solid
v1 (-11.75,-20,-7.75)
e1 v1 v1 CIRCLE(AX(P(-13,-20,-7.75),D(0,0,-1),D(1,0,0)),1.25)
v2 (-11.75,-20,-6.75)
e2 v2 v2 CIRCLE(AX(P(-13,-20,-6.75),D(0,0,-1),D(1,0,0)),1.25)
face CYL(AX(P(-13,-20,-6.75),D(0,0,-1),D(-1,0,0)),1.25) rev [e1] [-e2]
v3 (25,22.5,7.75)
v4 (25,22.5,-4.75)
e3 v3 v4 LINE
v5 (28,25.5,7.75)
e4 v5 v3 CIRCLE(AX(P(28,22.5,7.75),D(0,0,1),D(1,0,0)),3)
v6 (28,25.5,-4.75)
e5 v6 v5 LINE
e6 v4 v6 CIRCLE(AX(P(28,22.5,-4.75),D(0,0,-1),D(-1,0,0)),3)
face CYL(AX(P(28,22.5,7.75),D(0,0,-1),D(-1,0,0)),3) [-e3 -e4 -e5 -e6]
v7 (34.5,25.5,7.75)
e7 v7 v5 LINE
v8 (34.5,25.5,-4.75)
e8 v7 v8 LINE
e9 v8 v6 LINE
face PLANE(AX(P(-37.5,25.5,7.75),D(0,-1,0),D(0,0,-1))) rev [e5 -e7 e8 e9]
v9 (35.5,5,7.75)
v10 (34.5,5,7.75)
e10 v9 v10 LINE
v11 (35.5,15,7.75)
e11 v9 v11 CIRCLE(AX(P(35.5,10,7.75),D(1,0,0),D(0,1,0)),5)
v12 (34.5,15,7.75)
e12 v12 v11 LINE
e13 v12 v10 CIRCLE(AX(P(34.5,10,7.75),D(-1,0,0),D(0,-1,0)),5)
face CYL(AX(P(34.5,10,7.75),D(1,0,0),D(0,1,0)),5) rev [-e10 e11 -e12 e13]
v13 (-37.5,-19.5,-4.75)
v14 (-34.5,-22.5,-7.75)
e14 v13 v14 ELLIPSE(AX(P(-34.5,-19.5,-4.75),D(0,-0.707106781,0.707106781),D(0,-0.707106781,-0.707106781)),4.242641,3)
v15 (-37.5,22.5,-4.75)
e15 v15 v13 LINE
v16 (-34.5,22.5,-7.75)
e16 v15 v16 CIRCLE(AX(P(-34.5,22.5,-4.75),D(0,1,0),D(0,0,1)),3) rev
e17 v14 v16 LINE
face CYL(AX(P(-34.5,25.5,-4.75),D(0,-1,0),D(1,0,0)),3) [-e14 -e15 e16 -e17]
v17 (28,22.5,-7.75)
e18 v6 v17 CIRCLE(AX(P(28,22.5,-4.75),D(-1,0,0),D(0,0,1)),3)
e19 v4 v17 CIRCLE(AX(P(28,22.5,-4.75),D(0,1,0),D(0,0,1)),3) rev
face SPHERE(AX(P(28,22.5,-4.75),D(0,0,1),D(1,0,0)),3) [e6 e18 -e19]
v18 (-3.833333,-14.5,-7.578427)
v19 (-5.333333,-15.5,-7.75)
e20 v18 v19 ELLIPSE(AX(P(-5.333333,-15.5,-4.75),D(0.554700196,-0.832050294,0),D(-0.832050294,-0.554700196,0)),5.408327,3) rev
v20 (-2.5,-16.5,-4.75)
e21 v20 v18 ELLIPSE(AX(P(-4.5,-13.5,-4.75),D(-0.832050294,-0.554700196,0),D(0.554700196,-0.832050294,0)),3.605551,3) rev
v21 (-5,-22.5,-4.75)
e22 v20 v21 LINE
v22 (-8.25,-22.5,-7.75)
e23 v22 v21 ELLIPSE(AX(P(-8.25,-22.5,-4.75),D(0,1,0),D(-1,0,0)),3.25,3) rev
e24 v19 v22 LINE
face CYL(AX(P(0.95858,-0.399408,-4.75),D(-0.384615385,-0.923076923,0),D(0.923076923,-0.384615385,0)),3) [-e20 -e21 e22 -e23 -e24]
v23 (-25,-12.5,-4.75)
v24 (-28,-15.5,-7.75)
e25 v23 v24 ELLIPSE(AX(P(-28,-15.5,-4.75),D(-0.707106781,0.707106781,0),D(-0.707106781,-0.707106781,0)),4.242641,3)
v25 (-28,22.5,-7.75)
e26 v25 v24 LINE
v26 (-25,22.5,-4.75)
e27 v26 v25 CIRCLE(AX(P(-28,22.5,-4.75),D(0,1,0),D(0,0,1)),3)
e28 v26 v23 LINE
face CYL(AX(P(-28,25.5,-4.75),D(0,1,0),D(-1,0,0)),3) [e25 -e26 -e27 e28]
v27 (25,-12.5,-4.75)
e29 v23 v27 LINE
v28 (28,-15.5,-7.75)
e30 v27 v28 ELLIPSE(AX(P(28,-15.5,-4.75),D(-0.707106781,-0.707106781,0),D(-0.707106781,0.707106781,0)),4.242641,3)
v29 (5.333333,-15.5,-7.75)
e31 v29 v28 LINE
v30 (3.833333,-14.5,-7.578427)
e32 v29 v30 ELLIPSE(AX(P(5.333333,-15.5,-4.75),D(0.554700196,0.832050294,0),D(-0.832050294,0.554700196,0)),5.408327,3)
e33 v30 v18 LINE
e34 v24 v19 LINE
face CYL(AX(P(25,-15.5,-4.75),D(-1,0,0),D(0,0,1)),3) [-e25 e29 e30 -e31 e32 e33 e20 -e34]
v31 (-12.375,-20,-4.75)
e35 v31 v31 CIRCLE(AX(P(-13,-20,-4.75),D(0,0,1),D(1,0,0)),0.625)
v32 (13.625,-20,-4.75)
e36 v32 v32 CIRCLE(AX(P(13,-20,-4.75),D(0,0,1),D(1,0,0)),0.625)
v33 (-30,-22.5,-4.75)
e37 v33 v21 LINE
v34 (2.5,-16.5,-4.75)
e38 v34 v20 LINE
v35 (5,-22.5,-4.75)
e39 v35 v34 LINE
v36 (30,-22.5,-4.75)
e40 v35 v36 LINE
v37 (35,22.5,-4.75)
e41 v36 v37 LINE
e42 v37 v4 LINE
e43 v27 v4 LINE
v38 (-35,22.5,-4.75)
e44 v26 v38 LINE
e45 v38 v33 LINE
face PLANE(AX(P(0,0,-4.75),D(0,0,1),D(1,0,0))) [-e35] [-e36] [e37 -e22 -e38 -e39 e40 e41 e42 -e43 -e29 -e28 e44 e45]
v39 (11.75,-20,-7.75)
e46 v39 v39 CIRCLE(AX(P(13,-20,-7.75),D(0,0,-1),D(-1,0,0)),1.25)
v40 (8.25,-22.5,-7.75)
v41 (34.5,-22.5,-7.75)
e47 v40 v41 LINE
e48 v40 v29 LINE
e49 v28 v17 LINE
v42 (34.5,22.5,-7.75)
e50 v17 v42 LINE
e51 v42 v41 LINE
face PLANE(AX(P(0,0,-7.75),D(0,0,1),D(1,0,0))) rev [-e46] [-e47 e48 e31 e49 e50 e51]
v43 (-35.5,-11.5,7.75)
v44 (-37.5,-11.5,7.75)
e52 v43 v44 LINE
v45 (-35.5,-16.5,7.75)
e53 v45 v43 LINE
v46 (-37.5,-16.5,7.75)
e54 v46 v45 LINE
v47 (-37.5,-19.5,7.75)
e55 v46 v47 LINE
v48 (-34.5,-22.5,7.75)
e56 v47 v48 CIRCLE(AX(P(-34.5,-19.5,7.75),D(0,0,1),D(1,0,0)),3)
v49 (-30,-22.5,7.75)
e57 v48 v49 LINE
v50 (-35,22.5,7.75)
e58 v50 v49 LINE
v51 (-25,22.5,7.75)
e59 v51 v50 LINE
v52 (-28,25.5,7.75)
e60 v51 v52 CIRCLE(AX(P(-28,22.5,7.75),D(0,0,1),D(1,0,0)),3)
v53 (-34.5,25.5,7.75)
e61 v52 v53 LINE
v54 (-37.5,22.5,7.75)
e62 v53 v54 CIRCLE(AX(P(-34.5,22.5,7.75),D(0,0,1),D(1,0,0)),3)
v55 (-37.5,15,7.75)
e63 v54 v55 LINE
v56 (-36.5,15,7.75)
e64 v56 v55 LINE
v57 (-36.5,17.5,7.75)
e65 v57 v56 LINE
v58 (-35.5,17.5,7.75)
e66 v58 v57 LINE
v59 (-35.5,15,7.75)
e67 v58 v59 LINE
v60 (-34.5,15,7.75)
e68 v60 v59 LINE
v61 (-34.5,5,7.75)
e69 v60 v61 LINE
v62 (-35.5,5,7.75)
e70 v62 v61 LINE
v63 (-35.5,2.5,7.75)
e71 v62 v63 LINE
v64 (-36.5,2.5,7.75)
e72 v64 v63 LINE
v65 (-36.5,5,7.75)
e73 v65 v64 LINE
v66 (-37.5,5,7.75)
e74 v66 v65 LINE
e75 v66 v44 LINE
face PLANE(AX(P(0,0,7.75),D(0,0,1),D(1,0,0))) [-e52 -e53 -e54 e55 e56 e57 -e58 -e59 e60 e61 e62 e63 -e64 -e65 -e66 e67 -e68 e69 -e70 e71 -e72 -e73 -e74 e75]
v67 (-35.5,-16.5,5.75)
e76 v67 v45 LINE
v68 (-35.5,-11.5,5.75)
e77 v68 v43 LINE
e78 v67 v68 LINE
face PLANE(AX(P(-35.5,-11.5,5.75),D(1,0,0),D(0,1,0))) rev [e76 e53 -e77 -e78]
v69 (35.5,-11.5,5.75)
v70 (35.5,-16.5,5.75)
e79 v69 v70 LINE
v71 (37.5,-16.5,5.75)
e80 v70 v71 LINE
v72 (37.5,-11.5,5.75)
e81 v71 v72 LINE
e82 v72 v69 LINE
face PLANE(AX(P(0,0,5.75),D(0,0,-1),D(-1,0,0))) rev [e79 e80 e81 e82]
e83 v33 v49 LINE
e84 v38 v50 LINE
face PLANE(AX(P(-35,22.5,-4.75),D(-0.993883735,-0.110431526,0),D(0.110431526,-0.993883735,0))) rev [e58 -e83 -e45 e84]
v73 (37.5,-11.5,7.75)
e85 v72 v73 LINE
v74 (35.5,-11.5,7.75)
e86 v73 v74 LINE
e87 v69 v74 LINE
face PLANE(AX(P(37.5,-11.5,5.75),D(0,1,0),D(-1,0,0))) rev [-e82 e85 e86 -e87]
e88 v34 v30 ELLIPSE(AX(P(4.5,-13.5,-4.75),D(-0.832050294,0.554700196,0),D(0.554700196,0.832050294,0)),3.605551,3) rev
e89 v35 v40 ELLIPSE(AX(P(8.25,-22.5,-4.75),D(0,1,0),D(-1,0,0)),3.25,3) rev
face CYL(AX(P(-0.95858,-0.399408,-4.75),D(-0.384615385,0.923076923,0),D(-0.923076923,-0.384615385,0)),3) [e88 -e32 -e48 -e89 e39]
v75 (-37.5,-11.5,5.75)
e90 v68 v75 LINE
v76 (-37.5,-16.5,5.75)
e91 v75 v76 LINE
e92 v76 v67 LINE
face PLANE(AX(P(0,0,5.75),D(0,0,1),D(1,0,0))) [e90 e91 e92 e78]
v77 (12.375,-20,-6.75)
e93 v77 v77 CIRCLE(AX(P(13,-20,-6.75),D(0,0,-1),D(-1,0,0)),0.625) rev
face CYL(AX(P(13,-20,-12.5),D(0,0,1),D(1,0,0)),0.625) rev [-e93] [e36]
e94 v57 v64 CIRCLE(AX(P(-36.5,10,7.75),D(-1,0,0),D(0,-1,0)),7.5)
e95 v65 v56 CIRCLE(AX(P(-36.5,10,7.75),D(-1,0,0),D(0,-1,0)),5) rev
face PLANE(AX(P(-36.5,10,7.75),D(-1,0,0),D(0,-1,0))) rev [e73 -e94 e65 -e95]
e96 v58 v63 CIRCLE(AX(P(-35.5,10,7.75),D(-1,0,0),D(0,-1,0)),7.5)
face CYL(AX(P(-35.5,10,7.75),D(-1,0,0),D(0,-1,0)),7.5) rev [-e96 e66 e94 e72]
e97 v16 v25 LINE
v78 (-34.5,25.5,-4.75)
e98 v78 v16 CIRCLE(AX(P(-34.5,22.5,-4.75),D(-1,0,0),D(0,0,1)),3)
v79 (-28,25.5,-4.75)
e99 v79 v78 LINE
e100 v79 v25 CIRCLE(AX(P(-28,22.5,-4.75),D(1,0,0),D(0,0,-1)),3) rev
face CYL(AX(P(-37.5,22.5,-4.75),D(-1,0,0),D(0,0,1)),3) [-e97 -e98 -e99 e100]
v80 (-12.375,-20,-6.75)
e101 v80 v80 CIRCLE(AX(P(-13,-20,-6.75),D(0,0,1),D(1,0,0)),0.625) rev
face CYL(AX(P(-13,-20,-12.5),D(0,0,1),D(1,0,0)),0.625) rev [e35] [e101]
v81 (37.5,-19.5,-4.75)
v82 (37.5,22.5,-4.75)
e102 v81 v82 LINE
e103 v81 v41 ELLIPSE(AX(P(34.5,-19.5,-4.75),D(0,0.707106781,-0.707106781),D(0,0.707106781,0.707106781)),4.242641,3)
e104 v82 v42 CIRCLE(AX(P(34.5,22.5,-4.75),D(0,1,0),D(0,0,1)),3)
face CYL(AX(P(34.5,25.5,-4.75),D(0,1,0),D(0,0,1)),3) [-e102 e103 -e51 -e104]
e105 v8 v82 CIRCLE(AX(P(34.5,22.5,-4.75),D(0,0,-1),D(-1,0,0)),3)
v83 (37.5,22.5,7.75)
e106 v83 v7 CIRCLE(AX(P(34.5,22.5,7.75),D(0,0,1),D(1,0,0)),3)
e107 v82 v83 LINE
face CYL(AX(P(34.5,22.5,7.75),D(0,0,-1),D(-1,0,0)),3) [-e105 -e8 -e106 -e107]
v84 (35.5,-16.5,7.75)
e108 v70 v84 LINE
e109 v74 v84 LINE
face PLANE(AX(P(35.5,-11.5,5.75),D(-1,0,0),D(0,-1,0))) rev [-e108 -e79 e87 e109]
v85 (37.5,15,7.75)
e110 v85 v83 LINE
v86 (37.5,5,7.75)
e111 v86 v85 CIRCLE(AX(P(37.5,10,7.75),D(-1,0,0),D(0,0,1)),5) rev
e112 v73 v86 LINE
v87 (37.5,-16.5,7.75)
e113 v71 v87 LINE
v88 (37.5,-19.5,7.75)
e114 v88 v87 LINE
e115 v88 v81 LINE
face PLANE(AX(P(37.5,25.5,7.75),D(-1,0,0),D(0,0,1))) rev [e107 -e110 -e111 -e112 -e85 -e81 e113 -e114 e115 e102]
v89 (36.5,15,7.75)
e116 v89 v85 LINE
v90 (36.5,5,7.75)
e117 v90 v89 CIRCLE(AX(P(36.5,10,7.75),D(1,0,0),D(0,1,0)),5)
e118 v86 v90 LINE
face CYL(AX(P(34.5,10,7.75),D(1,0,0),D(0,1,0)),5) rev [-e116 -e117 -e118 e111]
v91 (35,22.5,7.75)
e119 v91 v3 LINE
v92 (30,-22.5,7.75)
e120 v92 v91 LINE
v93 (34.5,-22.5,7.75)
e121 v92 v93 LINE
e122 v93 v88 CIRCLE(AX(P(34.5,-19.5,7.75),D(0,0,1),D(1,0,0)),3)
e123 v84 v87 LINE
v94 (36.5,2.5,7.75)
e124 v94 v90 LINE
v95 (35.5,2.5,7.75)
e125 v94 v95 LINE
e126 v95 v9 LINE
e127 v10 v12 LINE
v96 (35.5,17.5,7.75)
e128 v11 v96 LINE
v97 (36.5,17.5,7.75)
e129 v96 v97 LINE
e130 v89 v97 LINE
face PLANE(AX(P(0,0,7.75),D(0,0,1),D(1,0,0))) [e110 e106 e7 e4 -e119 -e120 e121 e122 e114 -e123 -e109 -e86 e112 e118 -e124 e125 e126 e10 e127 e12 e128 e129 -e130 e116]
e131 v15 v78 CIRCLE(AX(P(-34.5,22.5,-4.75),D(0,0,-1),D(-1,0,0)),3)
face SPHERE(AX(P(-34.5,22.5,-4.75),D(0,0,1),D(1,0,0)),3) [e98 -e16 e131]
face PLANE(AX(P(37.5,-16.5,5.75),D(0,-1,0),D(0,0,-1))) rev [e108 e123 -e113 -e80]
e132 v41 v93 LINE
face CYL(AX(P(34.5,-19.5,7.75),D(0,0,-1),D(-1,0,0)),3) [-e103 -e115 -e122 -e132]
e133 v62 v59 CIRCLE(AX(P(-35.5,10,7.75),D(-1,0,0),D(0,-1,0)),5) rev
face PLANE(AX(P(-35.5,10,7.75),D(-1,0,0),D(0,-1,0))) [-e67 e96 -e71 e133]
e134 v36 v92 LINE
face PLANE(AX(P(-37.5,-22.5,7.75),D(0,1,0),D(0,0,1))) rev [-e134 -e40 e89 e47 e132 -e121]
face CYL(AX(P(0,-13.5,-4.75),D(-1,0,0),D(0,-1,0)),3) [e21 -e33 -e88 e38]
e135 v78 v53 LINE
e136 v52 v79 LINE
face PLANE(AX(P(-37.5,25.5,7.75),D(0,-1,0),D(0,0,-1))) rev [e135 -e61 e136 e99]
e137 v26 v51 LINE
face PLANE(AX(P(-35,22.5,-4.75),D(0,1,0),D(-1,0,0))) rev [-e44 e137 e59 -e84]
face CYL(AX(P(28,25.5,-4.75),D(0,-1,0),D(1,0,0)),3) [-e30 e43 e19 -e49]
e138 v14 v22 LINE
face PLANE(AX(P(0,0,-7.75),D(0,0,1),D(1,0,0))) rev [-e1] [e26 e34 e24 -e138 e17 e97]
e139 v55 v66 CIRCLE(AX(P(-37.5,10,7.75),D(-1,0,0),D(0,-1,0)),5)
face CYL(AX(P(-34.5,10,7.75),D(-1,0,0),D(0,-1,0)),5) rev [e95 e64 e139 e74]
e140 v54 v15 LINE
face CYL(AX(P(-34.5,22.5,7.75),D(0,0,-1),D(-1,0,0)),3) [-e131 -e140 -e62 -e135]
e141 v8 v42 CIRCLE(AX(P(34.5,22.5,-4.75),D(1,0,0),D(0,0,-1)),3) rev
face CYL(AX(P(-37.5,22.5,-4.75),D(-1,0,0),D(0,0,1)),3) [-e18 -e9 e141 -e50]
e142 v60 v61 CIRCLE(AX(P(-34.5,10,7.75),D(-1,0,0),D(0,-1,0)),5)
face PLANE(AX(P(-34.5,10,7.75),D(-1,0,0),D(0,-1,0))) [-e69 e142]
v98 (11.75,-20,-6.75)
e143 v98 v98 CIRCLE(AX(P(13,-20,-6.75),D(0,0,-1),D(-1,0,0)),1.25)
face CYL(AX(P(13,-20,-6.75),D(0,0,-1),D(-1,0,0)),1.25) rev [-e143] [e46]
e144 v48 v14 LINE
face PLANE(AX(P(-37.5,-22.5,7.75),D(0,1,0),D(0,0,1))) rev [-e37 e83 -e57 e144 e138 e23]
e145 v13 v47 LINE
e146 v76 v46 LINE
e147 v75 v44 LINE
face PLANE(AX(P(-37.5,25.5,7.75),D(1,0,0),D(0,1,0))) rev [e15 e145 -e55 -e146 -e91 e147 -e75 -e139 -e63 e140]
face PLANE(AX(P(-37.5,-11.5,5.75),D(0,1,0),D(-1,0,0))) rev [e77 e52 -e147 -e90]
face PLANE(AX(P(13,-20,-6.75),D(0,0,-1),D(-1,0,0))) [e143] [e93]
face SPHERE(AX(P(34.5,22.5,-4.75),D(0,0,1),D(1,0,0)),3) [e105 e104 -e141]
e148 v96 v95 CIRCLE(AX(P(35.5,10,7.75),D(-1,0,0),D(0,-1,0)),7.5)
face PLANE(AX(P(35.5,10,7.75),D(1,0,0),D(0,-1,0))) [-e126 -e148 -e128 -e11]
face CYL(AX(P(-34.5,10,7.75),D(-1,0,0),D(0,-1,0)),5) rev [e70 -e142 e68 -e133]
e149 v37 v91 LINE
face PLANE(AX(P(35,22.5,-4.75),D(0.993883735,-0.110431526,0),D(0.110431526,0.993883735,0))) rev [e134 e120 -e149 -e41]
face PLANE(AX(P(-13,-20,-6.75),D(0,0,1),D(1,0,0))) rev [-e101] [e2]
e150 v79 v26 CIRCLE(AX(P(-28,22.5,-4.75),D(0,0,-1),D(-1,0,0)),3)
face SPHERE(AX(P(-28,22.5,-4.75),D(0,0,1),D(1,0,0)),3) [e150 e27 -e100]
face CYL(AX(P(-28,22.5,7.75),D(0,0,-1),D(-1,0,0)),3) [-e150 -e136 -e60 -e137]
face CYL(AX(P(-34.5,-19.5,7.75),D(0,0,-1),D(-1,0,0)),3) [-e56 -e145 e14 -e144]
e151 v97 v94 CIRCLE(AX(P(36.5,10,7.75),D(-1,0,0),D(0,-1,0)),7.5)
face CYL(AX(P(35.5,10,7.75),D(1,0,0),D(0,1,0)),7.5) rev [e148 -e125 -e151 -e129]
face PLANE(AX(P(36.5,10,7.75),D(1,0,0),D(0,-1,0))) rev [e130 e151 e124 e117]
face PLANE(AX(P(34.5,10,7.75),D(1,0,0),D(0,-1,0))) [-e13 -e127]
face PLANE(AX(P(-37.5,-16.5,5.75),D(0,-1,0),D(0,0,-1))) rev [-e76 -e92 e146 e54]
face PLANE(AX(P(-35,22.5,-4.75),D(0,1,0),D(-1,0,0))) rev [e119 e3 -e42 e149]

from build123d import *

# Parameters (mm, degrees)
SKETCH1_W           = 75
SKETCH1_H           = 48
BOSS_EXTRUDE1_DEPTH = 7.75
CUT_EXTRUDE1_DEPTH  = 12.5
SKETCH3_W           = 50
SKETCH3_H           = 38
CUT_EXTRUDE2_DEPTH  = 48.924419663
SKETCH4_R           = 0.625
CUT_EXTRUDE3_DEPTH  = 12.5
FILLET1_R           = 3
SKETCH7_R           = 1.25
CUT_EXTRUDE4_DEPTH  = 1
SKETCH8_W           = 2
SKETCH8_H           = 5
CUT_EXTRUDE5_DEPTH  = 2
SKETCH9_R           = 5
CUT_EXTRUDE6_DEPTH  = 3
SKETCH10_R          = 7.5
CUT_EXTRUDE7_DEPTH  = 0.5


with BuildPart() as part:
    # Sketch1 → Boss-Extrude1 (new, symmetric)
    with BuildSketch(Plane.XY):
        with Locations((0, 1.5)):
            Rectangle(SKETCH1_W, SKETCH1_H)
    extrude(amount=BOSS_EXTRUDE1_DEPTH, both=True)

    # Sketch2 → Cut-Extrude1 (cut)
    with BuildSketch(Plane.XY.offset(7.75)):
        Polygon((-35, 22.5), (35, 22.5), (30, -22.5), (-30, -22.5), align=None)
    extrude(amount=-CUT_EXTRUDE1_DEPTH, mode=Mode.SUBTRACT)

    # Sketch3 → Cut-Extrude2 (cut, through all)
    with BuildSketch(Plane(origin=(0, 0, -7.75), x_dir=(-1, 0, 0), z_dir=(0, 0, -1))):
        with Locations((0, 6.5)):
            Rectangle(SKETCH3_W, SKETCH3_H)
    extrude(amount=-CUT_EXTRUDE2_DEPTH, mode=Mode.SUBTRACT)

    # Sketch4 → Cut-Extrude3 (cut)
    with BuildSketch(Plane.XY):
        with Locations((-13, -20)):
            Circle(SKETCH4_R)
        with Locations((13, -20)):
            Circle(SKETCH4_R)
        Polygon((2.5, -16.5), (5, -22.5), (-5, -22.5), (-2.5, -16.5), align=None)
    extrude(amount=-CUT_EXTRUDE3_DEPTH, mode=Mode.SUBTRACT)

    # Fillet1
    # the kernel refuses this fillet: 3 mm, written as the material it takes off along each edge
    with BuildSketch(Plane(origin=(34.5, 22.5, -4.75), x_dir=(1, 0, 0), z_dir=(0, 0, -1))) as fillet1_piece_1_section:
        Polygon((0, 0), (FILLET1_R, 0), (FILLET1_R, -FILLET1_R), (0, -FILLET1_R), align=None)
    fillet1_piece_1 = extrude(amount=FILLET1_R, mode=Mode.PRIVATE)
    fillet1_piece_1 = fillet1_piece_1 - Plane(origin=(34.5, 22.5, -4.75), x_dir=(-0.7071067811865475, -0.7071067811865475, 0), z_dir=(0, 0, -1)) * Sphere(FILLET1_R, mode=Mode.PRIVATE)
    add(fillet1_piece_1, mode=Mode.SUBTRACT)
    with BuildSketch(Plane(origin=(28, 22.5, -4.75), x_dir=(0, 0, -1), z_dir=(-1, 0, 0))) as fillet1_piece_2_section:
        Polygon((0, 0), (FILLET1_R, 0), (FILLET1_R, -FILLET1_R), (0, -FILLET1_R), align=None)
    fillet1_piece_2 = extrude(amount=FILLET1_R, mode=Mode.PRIVATE)
    fillet1_piece_2 = fillet1_piece_2 - Plane(origin=(28, 22.5, -4.75), x_dir=(0, -0.7071067811865475, 0.7071067811865475), z_dir=(-1, 0, 0)) * Sphere(FILLET1_R, mode=Mode.PRIVATE)
    add(fillet1_piece_2, mode=Mode.SUBTRACT)
    with BuildSketch(Plane(origin=(-28, 22.5, -4.75), x_dir=(1, 0, 0), z_dir=(0, 1, 0))) as fillet1_piece_3_section:
        Polygon((0, 0), (FILLET1_R, 0), (FILLET1_R, FILLET1_R), (0, FILLET1_R), align=None)
    fillet1_piece_3 = extrude(amount=FILLET1_R, mode=Mode.PRIVATE)
    fillet1_piece_3 = fillet1_piece_3 - Plane(origin=(-28, 22.5, -4.75), x_dir=(-0.7071067811865475, 0, 0.7071067811865475), z_dir=(0, 1, 0)) * Sphere(FILLET1_R, mode=Mode.PRIVATE)
    add(fillet1_piece_3, mode=Mode.SUBTRACT)
    with BuildSketch(Plane(origin=(-34.5, 22.5, -4.75), x_dir=(-1, 0, 0), z_dir=(0, 1, 0))) as fillet1_piece_4_section:
        Polygon((0, 0), (FILLET1_R, 0), (FILLET1_R, -FILLET1_R), (0, -FILLET1_R), align=None)
    fillet1_piece_4 = extrude(amount=FILLET1_R, mode=Mode.PRIVATE)
    fillet1_piece_4 = fillet1_piece_4 - Plane(origin=(-34.5, 22.5, -4.75), x_dir=(0.7071067811865475, 0, 0.7071067811865475), z_dir=(0, 1, 0)) * Sphere(FILLET1_R, mode=Mode.PRIVATE)
    add(fillet1_piece_4, mode=Mode.SUBTRACT)
    with BuildSketch(Plane(origin=(0.384615385, -9.576923077, -7.75), x_dir=(-0.9230769230769234, 0.3846153846153842, 0), z_dir=(-0.3846153846153842, -0.9230769230769232, 0))) as fillet1_piece_5_section:
        with BuildLine():
            CenterArc((FILLET1_R, -FILLET1_R), FILLET1_R, 90, 90)
            Line((0, -FILLET1_R), (0, 0))
            Line((0, 0), (FILLET1_R, 0))
        make_face()
    fillet1_piece_5 = extrude(amount=21.5, mode=Mode.PRIVATE)
    fillet1_piece_5 = split(fillet1_piece_5, bisect_by=Plane(origin=(-5.860923252, -16.5, -7.063308452), z_dir=(0, -1, 0)), keep=Keep.TOP, mode=Mode.PRIVATE)
    add(fillet1_piece_5, mode=Mode.SUBTRACT)
    with BuildSketch(Plane(origin=(7.884615385, -29.423076923, -7.75), x_dir=(0.923076923076923, 0.3846153846153847, 0), z_dir=(-0.3846153846153847, 0.9230769230769231, 0))) as fillet1_piece_6_section:
        with BuildLine():
            CenterArc((FILLET1_R, -FILLET1_R), FILLET1_R, 90, 90)
            Line((0, -FILLET1_R), (0, 0))
            Line((0, 0), (FILLET1_R, 0))
        make_face()
    fillet1_piece_6 = extrude(amount=21.5, mode=Mode.PRIVATE)
    fillet1_piece_6 = split(fillet1_piece_6, bisect_by=Plane(origin=(5.860923252, -16.5, -7.063308452), z_dir=(0, -1, 0)), keep=Keep.TOP, mode=Mode.PRIVATE)
    add(fillet1_piece_6, mode=Mode.SUBTRACT)
    with BuildSketch(Plane(origin=(10, -16.5, -7.75), x_dir=(0, 1, 0), z_dir=(-1, 0, 0))) as fillet1_piece_7_section:
        with BuildLine():
            CenterArc((FILLET1_R, -FILLET1_R), FILLET1_R, 90, 90)
            Line((0, -FILLET1_R), (0, 0))
            Line((0, 0), (FILLET1_R, 0))
        make_face()
    fillet1_piece_7 = extrude(amount=20, mode=Mode.PRIVATE)
    fillet1_piece_7 = split(fillet1_piece_7, bisect_by=Plane(origin=(-1.916956866, -15.100696479, -7.024372447), z_dir=(0.9230769230769232, -0.3846153846153842, 0)), keep=Keep.TOP, mode=Mode.PRIVATE)
    fillet1_piece_7 = split(fillet1_piece_7, bisect_by=Plane(origin=(1.916956866, -15.100696479, -7.024372447), z_dir=(-0.9230769230769231, -0.3846153846153847, 0)), keep=Keep.TOP, mode=Mode.PRIVATE)
    add(fillet1_piece_7, mode=Mode.SUBTRACT)
    with BuildSketch(Plane(origin=(-25, -12.5, -7.75), x_dir=(0, -1, 0), z_dir=(1, 0, 0))) as fillet1_piece_8:
        with BuildLine():
            CenterArc((FILLET1_R, -FILLET1_R), FILLET1_R, 90, 90)
            Line((0, -FILLET1_R), (0, 0))
            Line((0, 0), (FILLET1_R, 0))
        make_face()
    extrude(amount=50, mode=Mode.SUBTRACT)
    with BuildSketch(Plane(origin=(37.5, 25.5, 15.25), x_dir=(0, -1, 0), z_dir=(0, 0, -1)), Plane(origin=(-25, 25.5, -4.75), x_dir=(-1, 0, 0), z_dir=(0, 0, 1))) as fillet1_piece_9:
        with BuildLine():
            CenterArc((FILLET1_R, FILLET1_R), FILLET1_R, 180, 90)
            Line((0, FILLET1_R), (0, 0))
            Line((0, 0), (FILLET1_R, 0))
        make_face()
    extrude(amount=20, mode=Mode.SUBTRACT)
    with BuildSketch(Plane(origin=(28, 25.5, -7.75), x_dir=(0, -1, 0), z_dir=(1, 0, 0))) as fillet1_piece_10:
        with BuildLine():
            CenterArc((FILLET1_R, -FILLET1_R), FILLET1_R, 90, 90)
            Line((0, -FILLET1_R), (0, 0))
            Line((0, 0), (FILLET1_R, 0))
        make_face()
    extrude(amount=6.5, mode=Mode.SUBTRACT)
    with BuildSketch(Plane(origin=(25, 25.5, -4.75), x_dir=(1, 0, 0), z_dir=(0, 0, 1)), Plane(origin=(-37.5, 25.5, -4.75), x_dir=(1, 0, 0), z_dir=(0, 0, 1))) as fillet1_piece_11:
        with BuildLine():
            CenterArc((FILLET1_R, -FILLET1_R), FILLET1_R, 90, 90)
            Line((0, -FILLET1_R), (0, 0))
            Line((0, 0), (FILLET1_R, 0))
        make_face()
    extrude(amount=20, mode=Mode.SUBTRACT)
    with BuildSketch(Plane(origin=(-34.5, 25.5, -7.75), x_dir=(0, 0, 1), z_dir=(1, 0, 0))) as fillet1_piece_12:
        with BuildLine():
            CenterArc((FILLET1_R, FILLET1_R), FILLET1_R, 180, 90)
            Line((0, FILLET1_R), (0, 0))
            Line((0, 0), (FILLET1_R, 0))
        make_face()
    extrude(amount=6.5, mode=Mode.SUBTRACT)
    with BuildSketch(Plane(origin=(-37.5, -30, -7.75), x_dir=(0, 0, 1), z_dir=(0, 1, 0))) as fillet1_piece_13:
        with BuildLine():
            CenterArc((FILLET1_R, FILLET1_R), FILLET1_R, 180, 90)
            Line((0, FILLET1_R), (0, 0))
            Line((0, 0), (FILLET1_R, 0))
        make_face()
    extrude(amount=52.5, mode=Mode.SUBTRACT)
    with BuildSketch(Plane(origin=(-25, 22.5, -7.75), x_dir=(0, 0, 1), z_dir=(0, -1, 0))) as fillet1_piece_14:
        with BuildLine():
            CenterArc((FILLET1_R, FILLET1_R), FILLET1_R, 180, 90)
            Line((0, FILLET1_R), (0, 0))
            Line((0, 0), (FILLET1_R, 0))
        make_face()
    extrude(amount=35, mode=Mode.SUBTRACT)
    with BuildSketch(Plane(origin=(25, -12.5, -7.75), x_dir=(1, 0, 0), z_dir=(0, 1, 0))) as fillet1_piece_15:
        with BuildLine():
            CenterArc((FILLET1_R, -FILLET1_R), FILLET1_R, 90, 90)
            Line((0, -FILLET1_R), (0, 0))
            Line((0, 0), (FILLET1_R, 0))
        make_face()
    extrude(amount=35, mode=Mode.SUBTRACT)
    with BuildSketch(Plane(origin=(37.5, 22.5, -7.75), x_dir=(-1, 0, 0), z_dir=(0, -1, 0))) as fillet1_piece_16:
        with BuildLine():
            CenterArc((FILLET1_R, -FILLET1_R), FILLET1_R, 90, 90)
            Line((0, -FILLET1_R), (0, 0))
            Line((0, 0), (FILLET1_R, 0))
        make_face()
    extrude(amount=52.5, mode=Mode.SUBTRACT)
    with BuildSketch(Plane(origin=(-37.5, -22.5, -15.25), x_dir=(0, 1, 0), z_dir=(0, 0, 1))) as fillet1_piece_17:
        with BuildLine():
            CenterArc((FILLET1_R, -FILLET1_R), FILLET1_R, 90, 90)
            Line((0, -FILLET1_R), (0, 0))
            Line((0, 0), (FILLET1_R, 0))
        make_face()
    extrude(amount=30.5, mode=Mode.SUBTRACT)
    with BuildSketch(Plane(origin=(37.5, -22.5, 15.25), x_dir=(-1, 0, 0), z_dir=(0, 0, -1))) as fillet1_piece_18:
        with BuildLine():
            CenterArc((FILLET1_R, FILLET1_R), FILLET1_R, 180, 90)
            Line((0, FILLET1_R), (0, 0))
            Line((0, 0), (FILLET1_R, 0))
        make_face()
    extrude(amount=30.5, mode=Mode.SUBTRACT)
    with BuildSketch(Plane(origin=(0.384615385, -9.576923077, -7.75), x_dir=(-0.9230769230769234, 0.3846153846153842, 0), z_dir=(-0.3846153846153842, -0.9230769230769232, 0))) as fillet1_piece_19a_section:
        with BuildLine():
            CenterArc((FILLET1_R, -FILLET1_R), FILLET1_R, 90, 90)
            Line((0, -FILLET1_R), (0, 0))
            Line((0, 0), (FILLET1_R, 0))
        make_face()
    fillet1_piece_19a = extrude(amount=21.5, mode=Mode.PRIVATE)
    fillet1_piece_19a = split(fillet1_piece_19a, bisect_by=Plane(origin=(-1.76151966, -16.5, -7.084043842), z_dir=(0, 1, 0)), keep=Keep.TOP, mode=Mode.PRIVATE)
    with BuildSketch(Plane(origin=(10, -16.5, -7.75), x_dir=(0, 1, 0), z_dir=(-1, 0, 0))) as fillet1_piece_19b_section:
        with BuildLine():
            CenterArc((FILLET1_R, -FILLET1_R), FILLET1_R, 90, 90)
            Line((0, -FILLET1_R), (0, 0))
            Line((0, 0), (FILLET1_R, 0))
        make_face()
    fillet1_piece_19b = extrude(amount=20, mode=Mode.PRIVATE)
    fillet1_piece_19b = split(fillet1_piece_19b, bisect_by=Plane(origin=(-2.7840309, -17.18167416, -7.084043842), z_dir=(-0.9230769230769232, 0.3846153846153842, 0)), keep=Keep.TOP, mode=Mode.PRIVATE)
    fillet1_piece_19 = fillet1_piece_19a & fillet1_piece_19b
    add(fillet1_piece_19, mode=Mode.SUBTRACT)
    with BuildSketch(Plane(origin=(10, -16.5, -7.75), x_dir=(0, 1, 0), z_dir=(-1, 0, 0))) as fillet1_piece_20a_section:
        with BuildLine():
            CenterArc((FILLET1_R, -FILLET1_R), FILLET1_R, 90, 90)
            Line((0, -FILLET1_R), (0, 0))
            Line((0, 0), (FILLET1_R, 0))
        make_face()
    fillet1_piece_20a = extrude(amount=20, mode=Mode.PRIVATE)
    fillet1_piece_20a = split(fillet1_piece_20a, bisect_by=Plane(origin=(2.7840309, -17.18167416, -7.084043842), z_dir=(0.9230769230769231, 0.3846153846153847, 0)), keep=Keep.TOP, mode=Mode.PRIVATE)
    with BuildSketch(Plane(origin=(7.884615385, -29.423076923, -7.75), x_dir=(0.923076923076923, 0.3846153846153847, 0), z_dir=(-0.3846153846153847, 0.9230769230769231, 0))) as fillet1_piece_20b_section:
        with BuildLine():
            CenterArc((FILLET1_R, -FILLET1_R), FILLET1_R, 90, 90)
            Line((0, -FILLET1_R), (0, 0))
            Line((0, 0), (FILLET1_R, 0))
        make_face()
    fillet1_piece_20b = extrude(amount=21.5, mode=Mode.PRIVATE)
    fillet1_piece_20b = split(fillet1_piece_20b, bisect_by=Plane(origin=(1.76151966, -16.5, -7.084043842), z_dir=(0, 1, 0)), keep=Keep.TOP, mode=Mode.PRIVATE)
    fillet1_piece_20 = fillet1_piece_20a & fillet1_piece_20b
    add(fillet1_piece_20, mode=Mode.SUBTRACT)
    with BuildSketch(Plane(origin=(-25, 22.5, -7.75), x_dir=(0, 0, 1), z_dir=(0, -1, 0))) as fillet1_piece_21a_section:
        with BuildLine():
            CenterArc((FILLET1_R, FILLET1_R), FILLET1_R, 180, 90)
            Line((0, FILLET1_R), (0, 0))
            Line((0, 0), (FILLET1_R, 0))
        make_face()
    fillet1_piece_21a = extrude(amount=42.5, mode=Mode.PRIVATE)
    fillet1_piece_21a = split(fillet1_piece_21a, bisect_by=Plane(origin=(-25.679185343, -12.5, -7.070814657), z_dir=(0, -1, 0)), keep=Keep.TOP, mode=Mode.PRIVATE)
    with BuildSketch(Plane(origin=(-32.5, -12.5, -7.75), x_dir=(0, -1, 0), z_dir=(1, 0, 0))) as fillet1_piece_21b_section:
        with BuildLine():
            CenterArc((FILLET1_R, -FILLET1_R), FILLET1_R, 90, 90)
            Line((0, -FILLET1_R), (0, 0))
            Line((0, 0), (FILLET1_R, 0))
        make_face()
    fillet1_piece_21b = extrude(amount=57.5, mode=Mode.PRIVATE)
    fillet1_piece_21b = split(fillet1_piece_21b, bisect_by=Plane(origin=(-25, -13.179185343, -7.070814657), z_dir=(-1, 0, 0)), keep=Keep.TOP, mode=Mode.PRIVATE)
    fillet1_piece_21 = fillet1_piece_21a & fillet1_piece_21b
    add(fillet1_piece_21, mode=Mode.SUBTRACT)
    with BuildSketch(Plane(origin=(25, -20, -7.75), x_dir=(1, 0, 0), z_dir=(0, 1, 0))) as fillet1_piece_22a_section:
        with BuildLine():
            CenterArc((FILLET1_R, -FILLET1_R), FILLET1_R, 90, 90)
            Line((0, -FILLET1_R), (0, 0))
            Line((0, 0), (FILLET1_R, 0))
        make_face()
    fillet1_piece_22a = extrude(amount=42.5, mode=Mode.PRIVATE)
    fillet1_piece_22a = split(fillet1_piece_22a, bisect_by=Plane(origin=(25.679185343, -12.5, -7.070814657), z_dir=(0, -1, 0)), keep=Keep.TOP, mode=Mode.PRIVATE)
    with BuildSketch(Plane(origin=(-25, -12.5, -7.75), x_dir=(0, -1, 0), z_dir=(1, 0, 0))) as fillet1_piece_22b_section:
        with BuildLine():
            CenterArc((FILLET1_R, -FILLET1_R), FILLET1_R, 90, 90)
            Line((0, -FILLET1_R), (0, 0))
            Line((0, 0), (FILLET1_R, 0))
        make_face()
    fillet1_piece_22b = extrude(amount=57.5, mode=Mode.PRIVATE)
    fillet1_piece_22b = split(fillet1_piece_22b, bisect_by=Plane(origin=(25, -13.179185343, -7.070814657), z_dir=(1, 0, 0)), keep=Keep.TOP, mode=Mode.PRIVATE)
    fillet1_piece_22 = fillet1_piece_22a & fillet1_piece_22b
    add(fillet1_piece_22, mode=Mode.SUBTRACT)

    # Sketch7 → Cut-Extrude4 (cut)
    with BuildSketch(Plane(origin=(0, 0, -7.75), x_dir=(-1, 0, 0), z_dir=(0, 0, -1))):
        with Locations((-13, -20)):
            Circle(SKETCH7_R)
        with Locations(Location((13, -20, 0), (0, 0, 180))):
            Circle(SKETCH7_R)
    extrude(amount=-CUT_EXTRUDE4_DEPTH, mode=Mode.SUBTRACT)

    # Sketch8 → Cut-Extrude5 (cut)
    with BuildSketch(Plane.XY.offset(7.75)):
        with Locations((-36.5, -14)):
            Rectangle(SKETCH8_W, SKETCH8_H)
        with Locations((36.5, -14)):
            Rectangle(SKETCH8_W, SKETCH8_H)
    extrude(amount=-CUT_EXTRUDE5_DEPTH, mode=Mode.SUBTRACT)

    # Sketch9 → Cut-Extrude6 (cut)
    with BuildSketch(Plane.ZY.offset(37.5)):
        with Locations((7.75, 10)):
            Circle(SKETCH9_R)
    cut_extrude6 = extrude(amount=-CUT_EXTRUDE6_DEPTH, mode=Mode.SUBTRACT)

    # Sketch10 → Cut-Extrude7 (cut, symmetric)
    with BuildSketch(Plane.ZY.offset(36)):
        with Locations((7.75, 10)):
            Circle(SKETCH10_R)
    cut_extrude7 = extrude(amount=CUT_EXTRUDE7_DEPTH, both=True, mode=Mode.SUBTRACT)

    # Mirror1: Cut-Extrude6, Cut-Extrude7 across plane
    add(cut_extrude6.mirror(Plane(origin=(0, 0, 0), x_dir=(0, 0, 1), z_dir=(1, 0, 0))), mode=Mode.SUBTRACT)
    add(cut_extrude7.mirror(Plane(origin=(0, 0, 0), x_dir=(0, 0, 1), z_dir=(1, 0, 0))), mode=Mode.SUBTRACT)


solid = part.part
